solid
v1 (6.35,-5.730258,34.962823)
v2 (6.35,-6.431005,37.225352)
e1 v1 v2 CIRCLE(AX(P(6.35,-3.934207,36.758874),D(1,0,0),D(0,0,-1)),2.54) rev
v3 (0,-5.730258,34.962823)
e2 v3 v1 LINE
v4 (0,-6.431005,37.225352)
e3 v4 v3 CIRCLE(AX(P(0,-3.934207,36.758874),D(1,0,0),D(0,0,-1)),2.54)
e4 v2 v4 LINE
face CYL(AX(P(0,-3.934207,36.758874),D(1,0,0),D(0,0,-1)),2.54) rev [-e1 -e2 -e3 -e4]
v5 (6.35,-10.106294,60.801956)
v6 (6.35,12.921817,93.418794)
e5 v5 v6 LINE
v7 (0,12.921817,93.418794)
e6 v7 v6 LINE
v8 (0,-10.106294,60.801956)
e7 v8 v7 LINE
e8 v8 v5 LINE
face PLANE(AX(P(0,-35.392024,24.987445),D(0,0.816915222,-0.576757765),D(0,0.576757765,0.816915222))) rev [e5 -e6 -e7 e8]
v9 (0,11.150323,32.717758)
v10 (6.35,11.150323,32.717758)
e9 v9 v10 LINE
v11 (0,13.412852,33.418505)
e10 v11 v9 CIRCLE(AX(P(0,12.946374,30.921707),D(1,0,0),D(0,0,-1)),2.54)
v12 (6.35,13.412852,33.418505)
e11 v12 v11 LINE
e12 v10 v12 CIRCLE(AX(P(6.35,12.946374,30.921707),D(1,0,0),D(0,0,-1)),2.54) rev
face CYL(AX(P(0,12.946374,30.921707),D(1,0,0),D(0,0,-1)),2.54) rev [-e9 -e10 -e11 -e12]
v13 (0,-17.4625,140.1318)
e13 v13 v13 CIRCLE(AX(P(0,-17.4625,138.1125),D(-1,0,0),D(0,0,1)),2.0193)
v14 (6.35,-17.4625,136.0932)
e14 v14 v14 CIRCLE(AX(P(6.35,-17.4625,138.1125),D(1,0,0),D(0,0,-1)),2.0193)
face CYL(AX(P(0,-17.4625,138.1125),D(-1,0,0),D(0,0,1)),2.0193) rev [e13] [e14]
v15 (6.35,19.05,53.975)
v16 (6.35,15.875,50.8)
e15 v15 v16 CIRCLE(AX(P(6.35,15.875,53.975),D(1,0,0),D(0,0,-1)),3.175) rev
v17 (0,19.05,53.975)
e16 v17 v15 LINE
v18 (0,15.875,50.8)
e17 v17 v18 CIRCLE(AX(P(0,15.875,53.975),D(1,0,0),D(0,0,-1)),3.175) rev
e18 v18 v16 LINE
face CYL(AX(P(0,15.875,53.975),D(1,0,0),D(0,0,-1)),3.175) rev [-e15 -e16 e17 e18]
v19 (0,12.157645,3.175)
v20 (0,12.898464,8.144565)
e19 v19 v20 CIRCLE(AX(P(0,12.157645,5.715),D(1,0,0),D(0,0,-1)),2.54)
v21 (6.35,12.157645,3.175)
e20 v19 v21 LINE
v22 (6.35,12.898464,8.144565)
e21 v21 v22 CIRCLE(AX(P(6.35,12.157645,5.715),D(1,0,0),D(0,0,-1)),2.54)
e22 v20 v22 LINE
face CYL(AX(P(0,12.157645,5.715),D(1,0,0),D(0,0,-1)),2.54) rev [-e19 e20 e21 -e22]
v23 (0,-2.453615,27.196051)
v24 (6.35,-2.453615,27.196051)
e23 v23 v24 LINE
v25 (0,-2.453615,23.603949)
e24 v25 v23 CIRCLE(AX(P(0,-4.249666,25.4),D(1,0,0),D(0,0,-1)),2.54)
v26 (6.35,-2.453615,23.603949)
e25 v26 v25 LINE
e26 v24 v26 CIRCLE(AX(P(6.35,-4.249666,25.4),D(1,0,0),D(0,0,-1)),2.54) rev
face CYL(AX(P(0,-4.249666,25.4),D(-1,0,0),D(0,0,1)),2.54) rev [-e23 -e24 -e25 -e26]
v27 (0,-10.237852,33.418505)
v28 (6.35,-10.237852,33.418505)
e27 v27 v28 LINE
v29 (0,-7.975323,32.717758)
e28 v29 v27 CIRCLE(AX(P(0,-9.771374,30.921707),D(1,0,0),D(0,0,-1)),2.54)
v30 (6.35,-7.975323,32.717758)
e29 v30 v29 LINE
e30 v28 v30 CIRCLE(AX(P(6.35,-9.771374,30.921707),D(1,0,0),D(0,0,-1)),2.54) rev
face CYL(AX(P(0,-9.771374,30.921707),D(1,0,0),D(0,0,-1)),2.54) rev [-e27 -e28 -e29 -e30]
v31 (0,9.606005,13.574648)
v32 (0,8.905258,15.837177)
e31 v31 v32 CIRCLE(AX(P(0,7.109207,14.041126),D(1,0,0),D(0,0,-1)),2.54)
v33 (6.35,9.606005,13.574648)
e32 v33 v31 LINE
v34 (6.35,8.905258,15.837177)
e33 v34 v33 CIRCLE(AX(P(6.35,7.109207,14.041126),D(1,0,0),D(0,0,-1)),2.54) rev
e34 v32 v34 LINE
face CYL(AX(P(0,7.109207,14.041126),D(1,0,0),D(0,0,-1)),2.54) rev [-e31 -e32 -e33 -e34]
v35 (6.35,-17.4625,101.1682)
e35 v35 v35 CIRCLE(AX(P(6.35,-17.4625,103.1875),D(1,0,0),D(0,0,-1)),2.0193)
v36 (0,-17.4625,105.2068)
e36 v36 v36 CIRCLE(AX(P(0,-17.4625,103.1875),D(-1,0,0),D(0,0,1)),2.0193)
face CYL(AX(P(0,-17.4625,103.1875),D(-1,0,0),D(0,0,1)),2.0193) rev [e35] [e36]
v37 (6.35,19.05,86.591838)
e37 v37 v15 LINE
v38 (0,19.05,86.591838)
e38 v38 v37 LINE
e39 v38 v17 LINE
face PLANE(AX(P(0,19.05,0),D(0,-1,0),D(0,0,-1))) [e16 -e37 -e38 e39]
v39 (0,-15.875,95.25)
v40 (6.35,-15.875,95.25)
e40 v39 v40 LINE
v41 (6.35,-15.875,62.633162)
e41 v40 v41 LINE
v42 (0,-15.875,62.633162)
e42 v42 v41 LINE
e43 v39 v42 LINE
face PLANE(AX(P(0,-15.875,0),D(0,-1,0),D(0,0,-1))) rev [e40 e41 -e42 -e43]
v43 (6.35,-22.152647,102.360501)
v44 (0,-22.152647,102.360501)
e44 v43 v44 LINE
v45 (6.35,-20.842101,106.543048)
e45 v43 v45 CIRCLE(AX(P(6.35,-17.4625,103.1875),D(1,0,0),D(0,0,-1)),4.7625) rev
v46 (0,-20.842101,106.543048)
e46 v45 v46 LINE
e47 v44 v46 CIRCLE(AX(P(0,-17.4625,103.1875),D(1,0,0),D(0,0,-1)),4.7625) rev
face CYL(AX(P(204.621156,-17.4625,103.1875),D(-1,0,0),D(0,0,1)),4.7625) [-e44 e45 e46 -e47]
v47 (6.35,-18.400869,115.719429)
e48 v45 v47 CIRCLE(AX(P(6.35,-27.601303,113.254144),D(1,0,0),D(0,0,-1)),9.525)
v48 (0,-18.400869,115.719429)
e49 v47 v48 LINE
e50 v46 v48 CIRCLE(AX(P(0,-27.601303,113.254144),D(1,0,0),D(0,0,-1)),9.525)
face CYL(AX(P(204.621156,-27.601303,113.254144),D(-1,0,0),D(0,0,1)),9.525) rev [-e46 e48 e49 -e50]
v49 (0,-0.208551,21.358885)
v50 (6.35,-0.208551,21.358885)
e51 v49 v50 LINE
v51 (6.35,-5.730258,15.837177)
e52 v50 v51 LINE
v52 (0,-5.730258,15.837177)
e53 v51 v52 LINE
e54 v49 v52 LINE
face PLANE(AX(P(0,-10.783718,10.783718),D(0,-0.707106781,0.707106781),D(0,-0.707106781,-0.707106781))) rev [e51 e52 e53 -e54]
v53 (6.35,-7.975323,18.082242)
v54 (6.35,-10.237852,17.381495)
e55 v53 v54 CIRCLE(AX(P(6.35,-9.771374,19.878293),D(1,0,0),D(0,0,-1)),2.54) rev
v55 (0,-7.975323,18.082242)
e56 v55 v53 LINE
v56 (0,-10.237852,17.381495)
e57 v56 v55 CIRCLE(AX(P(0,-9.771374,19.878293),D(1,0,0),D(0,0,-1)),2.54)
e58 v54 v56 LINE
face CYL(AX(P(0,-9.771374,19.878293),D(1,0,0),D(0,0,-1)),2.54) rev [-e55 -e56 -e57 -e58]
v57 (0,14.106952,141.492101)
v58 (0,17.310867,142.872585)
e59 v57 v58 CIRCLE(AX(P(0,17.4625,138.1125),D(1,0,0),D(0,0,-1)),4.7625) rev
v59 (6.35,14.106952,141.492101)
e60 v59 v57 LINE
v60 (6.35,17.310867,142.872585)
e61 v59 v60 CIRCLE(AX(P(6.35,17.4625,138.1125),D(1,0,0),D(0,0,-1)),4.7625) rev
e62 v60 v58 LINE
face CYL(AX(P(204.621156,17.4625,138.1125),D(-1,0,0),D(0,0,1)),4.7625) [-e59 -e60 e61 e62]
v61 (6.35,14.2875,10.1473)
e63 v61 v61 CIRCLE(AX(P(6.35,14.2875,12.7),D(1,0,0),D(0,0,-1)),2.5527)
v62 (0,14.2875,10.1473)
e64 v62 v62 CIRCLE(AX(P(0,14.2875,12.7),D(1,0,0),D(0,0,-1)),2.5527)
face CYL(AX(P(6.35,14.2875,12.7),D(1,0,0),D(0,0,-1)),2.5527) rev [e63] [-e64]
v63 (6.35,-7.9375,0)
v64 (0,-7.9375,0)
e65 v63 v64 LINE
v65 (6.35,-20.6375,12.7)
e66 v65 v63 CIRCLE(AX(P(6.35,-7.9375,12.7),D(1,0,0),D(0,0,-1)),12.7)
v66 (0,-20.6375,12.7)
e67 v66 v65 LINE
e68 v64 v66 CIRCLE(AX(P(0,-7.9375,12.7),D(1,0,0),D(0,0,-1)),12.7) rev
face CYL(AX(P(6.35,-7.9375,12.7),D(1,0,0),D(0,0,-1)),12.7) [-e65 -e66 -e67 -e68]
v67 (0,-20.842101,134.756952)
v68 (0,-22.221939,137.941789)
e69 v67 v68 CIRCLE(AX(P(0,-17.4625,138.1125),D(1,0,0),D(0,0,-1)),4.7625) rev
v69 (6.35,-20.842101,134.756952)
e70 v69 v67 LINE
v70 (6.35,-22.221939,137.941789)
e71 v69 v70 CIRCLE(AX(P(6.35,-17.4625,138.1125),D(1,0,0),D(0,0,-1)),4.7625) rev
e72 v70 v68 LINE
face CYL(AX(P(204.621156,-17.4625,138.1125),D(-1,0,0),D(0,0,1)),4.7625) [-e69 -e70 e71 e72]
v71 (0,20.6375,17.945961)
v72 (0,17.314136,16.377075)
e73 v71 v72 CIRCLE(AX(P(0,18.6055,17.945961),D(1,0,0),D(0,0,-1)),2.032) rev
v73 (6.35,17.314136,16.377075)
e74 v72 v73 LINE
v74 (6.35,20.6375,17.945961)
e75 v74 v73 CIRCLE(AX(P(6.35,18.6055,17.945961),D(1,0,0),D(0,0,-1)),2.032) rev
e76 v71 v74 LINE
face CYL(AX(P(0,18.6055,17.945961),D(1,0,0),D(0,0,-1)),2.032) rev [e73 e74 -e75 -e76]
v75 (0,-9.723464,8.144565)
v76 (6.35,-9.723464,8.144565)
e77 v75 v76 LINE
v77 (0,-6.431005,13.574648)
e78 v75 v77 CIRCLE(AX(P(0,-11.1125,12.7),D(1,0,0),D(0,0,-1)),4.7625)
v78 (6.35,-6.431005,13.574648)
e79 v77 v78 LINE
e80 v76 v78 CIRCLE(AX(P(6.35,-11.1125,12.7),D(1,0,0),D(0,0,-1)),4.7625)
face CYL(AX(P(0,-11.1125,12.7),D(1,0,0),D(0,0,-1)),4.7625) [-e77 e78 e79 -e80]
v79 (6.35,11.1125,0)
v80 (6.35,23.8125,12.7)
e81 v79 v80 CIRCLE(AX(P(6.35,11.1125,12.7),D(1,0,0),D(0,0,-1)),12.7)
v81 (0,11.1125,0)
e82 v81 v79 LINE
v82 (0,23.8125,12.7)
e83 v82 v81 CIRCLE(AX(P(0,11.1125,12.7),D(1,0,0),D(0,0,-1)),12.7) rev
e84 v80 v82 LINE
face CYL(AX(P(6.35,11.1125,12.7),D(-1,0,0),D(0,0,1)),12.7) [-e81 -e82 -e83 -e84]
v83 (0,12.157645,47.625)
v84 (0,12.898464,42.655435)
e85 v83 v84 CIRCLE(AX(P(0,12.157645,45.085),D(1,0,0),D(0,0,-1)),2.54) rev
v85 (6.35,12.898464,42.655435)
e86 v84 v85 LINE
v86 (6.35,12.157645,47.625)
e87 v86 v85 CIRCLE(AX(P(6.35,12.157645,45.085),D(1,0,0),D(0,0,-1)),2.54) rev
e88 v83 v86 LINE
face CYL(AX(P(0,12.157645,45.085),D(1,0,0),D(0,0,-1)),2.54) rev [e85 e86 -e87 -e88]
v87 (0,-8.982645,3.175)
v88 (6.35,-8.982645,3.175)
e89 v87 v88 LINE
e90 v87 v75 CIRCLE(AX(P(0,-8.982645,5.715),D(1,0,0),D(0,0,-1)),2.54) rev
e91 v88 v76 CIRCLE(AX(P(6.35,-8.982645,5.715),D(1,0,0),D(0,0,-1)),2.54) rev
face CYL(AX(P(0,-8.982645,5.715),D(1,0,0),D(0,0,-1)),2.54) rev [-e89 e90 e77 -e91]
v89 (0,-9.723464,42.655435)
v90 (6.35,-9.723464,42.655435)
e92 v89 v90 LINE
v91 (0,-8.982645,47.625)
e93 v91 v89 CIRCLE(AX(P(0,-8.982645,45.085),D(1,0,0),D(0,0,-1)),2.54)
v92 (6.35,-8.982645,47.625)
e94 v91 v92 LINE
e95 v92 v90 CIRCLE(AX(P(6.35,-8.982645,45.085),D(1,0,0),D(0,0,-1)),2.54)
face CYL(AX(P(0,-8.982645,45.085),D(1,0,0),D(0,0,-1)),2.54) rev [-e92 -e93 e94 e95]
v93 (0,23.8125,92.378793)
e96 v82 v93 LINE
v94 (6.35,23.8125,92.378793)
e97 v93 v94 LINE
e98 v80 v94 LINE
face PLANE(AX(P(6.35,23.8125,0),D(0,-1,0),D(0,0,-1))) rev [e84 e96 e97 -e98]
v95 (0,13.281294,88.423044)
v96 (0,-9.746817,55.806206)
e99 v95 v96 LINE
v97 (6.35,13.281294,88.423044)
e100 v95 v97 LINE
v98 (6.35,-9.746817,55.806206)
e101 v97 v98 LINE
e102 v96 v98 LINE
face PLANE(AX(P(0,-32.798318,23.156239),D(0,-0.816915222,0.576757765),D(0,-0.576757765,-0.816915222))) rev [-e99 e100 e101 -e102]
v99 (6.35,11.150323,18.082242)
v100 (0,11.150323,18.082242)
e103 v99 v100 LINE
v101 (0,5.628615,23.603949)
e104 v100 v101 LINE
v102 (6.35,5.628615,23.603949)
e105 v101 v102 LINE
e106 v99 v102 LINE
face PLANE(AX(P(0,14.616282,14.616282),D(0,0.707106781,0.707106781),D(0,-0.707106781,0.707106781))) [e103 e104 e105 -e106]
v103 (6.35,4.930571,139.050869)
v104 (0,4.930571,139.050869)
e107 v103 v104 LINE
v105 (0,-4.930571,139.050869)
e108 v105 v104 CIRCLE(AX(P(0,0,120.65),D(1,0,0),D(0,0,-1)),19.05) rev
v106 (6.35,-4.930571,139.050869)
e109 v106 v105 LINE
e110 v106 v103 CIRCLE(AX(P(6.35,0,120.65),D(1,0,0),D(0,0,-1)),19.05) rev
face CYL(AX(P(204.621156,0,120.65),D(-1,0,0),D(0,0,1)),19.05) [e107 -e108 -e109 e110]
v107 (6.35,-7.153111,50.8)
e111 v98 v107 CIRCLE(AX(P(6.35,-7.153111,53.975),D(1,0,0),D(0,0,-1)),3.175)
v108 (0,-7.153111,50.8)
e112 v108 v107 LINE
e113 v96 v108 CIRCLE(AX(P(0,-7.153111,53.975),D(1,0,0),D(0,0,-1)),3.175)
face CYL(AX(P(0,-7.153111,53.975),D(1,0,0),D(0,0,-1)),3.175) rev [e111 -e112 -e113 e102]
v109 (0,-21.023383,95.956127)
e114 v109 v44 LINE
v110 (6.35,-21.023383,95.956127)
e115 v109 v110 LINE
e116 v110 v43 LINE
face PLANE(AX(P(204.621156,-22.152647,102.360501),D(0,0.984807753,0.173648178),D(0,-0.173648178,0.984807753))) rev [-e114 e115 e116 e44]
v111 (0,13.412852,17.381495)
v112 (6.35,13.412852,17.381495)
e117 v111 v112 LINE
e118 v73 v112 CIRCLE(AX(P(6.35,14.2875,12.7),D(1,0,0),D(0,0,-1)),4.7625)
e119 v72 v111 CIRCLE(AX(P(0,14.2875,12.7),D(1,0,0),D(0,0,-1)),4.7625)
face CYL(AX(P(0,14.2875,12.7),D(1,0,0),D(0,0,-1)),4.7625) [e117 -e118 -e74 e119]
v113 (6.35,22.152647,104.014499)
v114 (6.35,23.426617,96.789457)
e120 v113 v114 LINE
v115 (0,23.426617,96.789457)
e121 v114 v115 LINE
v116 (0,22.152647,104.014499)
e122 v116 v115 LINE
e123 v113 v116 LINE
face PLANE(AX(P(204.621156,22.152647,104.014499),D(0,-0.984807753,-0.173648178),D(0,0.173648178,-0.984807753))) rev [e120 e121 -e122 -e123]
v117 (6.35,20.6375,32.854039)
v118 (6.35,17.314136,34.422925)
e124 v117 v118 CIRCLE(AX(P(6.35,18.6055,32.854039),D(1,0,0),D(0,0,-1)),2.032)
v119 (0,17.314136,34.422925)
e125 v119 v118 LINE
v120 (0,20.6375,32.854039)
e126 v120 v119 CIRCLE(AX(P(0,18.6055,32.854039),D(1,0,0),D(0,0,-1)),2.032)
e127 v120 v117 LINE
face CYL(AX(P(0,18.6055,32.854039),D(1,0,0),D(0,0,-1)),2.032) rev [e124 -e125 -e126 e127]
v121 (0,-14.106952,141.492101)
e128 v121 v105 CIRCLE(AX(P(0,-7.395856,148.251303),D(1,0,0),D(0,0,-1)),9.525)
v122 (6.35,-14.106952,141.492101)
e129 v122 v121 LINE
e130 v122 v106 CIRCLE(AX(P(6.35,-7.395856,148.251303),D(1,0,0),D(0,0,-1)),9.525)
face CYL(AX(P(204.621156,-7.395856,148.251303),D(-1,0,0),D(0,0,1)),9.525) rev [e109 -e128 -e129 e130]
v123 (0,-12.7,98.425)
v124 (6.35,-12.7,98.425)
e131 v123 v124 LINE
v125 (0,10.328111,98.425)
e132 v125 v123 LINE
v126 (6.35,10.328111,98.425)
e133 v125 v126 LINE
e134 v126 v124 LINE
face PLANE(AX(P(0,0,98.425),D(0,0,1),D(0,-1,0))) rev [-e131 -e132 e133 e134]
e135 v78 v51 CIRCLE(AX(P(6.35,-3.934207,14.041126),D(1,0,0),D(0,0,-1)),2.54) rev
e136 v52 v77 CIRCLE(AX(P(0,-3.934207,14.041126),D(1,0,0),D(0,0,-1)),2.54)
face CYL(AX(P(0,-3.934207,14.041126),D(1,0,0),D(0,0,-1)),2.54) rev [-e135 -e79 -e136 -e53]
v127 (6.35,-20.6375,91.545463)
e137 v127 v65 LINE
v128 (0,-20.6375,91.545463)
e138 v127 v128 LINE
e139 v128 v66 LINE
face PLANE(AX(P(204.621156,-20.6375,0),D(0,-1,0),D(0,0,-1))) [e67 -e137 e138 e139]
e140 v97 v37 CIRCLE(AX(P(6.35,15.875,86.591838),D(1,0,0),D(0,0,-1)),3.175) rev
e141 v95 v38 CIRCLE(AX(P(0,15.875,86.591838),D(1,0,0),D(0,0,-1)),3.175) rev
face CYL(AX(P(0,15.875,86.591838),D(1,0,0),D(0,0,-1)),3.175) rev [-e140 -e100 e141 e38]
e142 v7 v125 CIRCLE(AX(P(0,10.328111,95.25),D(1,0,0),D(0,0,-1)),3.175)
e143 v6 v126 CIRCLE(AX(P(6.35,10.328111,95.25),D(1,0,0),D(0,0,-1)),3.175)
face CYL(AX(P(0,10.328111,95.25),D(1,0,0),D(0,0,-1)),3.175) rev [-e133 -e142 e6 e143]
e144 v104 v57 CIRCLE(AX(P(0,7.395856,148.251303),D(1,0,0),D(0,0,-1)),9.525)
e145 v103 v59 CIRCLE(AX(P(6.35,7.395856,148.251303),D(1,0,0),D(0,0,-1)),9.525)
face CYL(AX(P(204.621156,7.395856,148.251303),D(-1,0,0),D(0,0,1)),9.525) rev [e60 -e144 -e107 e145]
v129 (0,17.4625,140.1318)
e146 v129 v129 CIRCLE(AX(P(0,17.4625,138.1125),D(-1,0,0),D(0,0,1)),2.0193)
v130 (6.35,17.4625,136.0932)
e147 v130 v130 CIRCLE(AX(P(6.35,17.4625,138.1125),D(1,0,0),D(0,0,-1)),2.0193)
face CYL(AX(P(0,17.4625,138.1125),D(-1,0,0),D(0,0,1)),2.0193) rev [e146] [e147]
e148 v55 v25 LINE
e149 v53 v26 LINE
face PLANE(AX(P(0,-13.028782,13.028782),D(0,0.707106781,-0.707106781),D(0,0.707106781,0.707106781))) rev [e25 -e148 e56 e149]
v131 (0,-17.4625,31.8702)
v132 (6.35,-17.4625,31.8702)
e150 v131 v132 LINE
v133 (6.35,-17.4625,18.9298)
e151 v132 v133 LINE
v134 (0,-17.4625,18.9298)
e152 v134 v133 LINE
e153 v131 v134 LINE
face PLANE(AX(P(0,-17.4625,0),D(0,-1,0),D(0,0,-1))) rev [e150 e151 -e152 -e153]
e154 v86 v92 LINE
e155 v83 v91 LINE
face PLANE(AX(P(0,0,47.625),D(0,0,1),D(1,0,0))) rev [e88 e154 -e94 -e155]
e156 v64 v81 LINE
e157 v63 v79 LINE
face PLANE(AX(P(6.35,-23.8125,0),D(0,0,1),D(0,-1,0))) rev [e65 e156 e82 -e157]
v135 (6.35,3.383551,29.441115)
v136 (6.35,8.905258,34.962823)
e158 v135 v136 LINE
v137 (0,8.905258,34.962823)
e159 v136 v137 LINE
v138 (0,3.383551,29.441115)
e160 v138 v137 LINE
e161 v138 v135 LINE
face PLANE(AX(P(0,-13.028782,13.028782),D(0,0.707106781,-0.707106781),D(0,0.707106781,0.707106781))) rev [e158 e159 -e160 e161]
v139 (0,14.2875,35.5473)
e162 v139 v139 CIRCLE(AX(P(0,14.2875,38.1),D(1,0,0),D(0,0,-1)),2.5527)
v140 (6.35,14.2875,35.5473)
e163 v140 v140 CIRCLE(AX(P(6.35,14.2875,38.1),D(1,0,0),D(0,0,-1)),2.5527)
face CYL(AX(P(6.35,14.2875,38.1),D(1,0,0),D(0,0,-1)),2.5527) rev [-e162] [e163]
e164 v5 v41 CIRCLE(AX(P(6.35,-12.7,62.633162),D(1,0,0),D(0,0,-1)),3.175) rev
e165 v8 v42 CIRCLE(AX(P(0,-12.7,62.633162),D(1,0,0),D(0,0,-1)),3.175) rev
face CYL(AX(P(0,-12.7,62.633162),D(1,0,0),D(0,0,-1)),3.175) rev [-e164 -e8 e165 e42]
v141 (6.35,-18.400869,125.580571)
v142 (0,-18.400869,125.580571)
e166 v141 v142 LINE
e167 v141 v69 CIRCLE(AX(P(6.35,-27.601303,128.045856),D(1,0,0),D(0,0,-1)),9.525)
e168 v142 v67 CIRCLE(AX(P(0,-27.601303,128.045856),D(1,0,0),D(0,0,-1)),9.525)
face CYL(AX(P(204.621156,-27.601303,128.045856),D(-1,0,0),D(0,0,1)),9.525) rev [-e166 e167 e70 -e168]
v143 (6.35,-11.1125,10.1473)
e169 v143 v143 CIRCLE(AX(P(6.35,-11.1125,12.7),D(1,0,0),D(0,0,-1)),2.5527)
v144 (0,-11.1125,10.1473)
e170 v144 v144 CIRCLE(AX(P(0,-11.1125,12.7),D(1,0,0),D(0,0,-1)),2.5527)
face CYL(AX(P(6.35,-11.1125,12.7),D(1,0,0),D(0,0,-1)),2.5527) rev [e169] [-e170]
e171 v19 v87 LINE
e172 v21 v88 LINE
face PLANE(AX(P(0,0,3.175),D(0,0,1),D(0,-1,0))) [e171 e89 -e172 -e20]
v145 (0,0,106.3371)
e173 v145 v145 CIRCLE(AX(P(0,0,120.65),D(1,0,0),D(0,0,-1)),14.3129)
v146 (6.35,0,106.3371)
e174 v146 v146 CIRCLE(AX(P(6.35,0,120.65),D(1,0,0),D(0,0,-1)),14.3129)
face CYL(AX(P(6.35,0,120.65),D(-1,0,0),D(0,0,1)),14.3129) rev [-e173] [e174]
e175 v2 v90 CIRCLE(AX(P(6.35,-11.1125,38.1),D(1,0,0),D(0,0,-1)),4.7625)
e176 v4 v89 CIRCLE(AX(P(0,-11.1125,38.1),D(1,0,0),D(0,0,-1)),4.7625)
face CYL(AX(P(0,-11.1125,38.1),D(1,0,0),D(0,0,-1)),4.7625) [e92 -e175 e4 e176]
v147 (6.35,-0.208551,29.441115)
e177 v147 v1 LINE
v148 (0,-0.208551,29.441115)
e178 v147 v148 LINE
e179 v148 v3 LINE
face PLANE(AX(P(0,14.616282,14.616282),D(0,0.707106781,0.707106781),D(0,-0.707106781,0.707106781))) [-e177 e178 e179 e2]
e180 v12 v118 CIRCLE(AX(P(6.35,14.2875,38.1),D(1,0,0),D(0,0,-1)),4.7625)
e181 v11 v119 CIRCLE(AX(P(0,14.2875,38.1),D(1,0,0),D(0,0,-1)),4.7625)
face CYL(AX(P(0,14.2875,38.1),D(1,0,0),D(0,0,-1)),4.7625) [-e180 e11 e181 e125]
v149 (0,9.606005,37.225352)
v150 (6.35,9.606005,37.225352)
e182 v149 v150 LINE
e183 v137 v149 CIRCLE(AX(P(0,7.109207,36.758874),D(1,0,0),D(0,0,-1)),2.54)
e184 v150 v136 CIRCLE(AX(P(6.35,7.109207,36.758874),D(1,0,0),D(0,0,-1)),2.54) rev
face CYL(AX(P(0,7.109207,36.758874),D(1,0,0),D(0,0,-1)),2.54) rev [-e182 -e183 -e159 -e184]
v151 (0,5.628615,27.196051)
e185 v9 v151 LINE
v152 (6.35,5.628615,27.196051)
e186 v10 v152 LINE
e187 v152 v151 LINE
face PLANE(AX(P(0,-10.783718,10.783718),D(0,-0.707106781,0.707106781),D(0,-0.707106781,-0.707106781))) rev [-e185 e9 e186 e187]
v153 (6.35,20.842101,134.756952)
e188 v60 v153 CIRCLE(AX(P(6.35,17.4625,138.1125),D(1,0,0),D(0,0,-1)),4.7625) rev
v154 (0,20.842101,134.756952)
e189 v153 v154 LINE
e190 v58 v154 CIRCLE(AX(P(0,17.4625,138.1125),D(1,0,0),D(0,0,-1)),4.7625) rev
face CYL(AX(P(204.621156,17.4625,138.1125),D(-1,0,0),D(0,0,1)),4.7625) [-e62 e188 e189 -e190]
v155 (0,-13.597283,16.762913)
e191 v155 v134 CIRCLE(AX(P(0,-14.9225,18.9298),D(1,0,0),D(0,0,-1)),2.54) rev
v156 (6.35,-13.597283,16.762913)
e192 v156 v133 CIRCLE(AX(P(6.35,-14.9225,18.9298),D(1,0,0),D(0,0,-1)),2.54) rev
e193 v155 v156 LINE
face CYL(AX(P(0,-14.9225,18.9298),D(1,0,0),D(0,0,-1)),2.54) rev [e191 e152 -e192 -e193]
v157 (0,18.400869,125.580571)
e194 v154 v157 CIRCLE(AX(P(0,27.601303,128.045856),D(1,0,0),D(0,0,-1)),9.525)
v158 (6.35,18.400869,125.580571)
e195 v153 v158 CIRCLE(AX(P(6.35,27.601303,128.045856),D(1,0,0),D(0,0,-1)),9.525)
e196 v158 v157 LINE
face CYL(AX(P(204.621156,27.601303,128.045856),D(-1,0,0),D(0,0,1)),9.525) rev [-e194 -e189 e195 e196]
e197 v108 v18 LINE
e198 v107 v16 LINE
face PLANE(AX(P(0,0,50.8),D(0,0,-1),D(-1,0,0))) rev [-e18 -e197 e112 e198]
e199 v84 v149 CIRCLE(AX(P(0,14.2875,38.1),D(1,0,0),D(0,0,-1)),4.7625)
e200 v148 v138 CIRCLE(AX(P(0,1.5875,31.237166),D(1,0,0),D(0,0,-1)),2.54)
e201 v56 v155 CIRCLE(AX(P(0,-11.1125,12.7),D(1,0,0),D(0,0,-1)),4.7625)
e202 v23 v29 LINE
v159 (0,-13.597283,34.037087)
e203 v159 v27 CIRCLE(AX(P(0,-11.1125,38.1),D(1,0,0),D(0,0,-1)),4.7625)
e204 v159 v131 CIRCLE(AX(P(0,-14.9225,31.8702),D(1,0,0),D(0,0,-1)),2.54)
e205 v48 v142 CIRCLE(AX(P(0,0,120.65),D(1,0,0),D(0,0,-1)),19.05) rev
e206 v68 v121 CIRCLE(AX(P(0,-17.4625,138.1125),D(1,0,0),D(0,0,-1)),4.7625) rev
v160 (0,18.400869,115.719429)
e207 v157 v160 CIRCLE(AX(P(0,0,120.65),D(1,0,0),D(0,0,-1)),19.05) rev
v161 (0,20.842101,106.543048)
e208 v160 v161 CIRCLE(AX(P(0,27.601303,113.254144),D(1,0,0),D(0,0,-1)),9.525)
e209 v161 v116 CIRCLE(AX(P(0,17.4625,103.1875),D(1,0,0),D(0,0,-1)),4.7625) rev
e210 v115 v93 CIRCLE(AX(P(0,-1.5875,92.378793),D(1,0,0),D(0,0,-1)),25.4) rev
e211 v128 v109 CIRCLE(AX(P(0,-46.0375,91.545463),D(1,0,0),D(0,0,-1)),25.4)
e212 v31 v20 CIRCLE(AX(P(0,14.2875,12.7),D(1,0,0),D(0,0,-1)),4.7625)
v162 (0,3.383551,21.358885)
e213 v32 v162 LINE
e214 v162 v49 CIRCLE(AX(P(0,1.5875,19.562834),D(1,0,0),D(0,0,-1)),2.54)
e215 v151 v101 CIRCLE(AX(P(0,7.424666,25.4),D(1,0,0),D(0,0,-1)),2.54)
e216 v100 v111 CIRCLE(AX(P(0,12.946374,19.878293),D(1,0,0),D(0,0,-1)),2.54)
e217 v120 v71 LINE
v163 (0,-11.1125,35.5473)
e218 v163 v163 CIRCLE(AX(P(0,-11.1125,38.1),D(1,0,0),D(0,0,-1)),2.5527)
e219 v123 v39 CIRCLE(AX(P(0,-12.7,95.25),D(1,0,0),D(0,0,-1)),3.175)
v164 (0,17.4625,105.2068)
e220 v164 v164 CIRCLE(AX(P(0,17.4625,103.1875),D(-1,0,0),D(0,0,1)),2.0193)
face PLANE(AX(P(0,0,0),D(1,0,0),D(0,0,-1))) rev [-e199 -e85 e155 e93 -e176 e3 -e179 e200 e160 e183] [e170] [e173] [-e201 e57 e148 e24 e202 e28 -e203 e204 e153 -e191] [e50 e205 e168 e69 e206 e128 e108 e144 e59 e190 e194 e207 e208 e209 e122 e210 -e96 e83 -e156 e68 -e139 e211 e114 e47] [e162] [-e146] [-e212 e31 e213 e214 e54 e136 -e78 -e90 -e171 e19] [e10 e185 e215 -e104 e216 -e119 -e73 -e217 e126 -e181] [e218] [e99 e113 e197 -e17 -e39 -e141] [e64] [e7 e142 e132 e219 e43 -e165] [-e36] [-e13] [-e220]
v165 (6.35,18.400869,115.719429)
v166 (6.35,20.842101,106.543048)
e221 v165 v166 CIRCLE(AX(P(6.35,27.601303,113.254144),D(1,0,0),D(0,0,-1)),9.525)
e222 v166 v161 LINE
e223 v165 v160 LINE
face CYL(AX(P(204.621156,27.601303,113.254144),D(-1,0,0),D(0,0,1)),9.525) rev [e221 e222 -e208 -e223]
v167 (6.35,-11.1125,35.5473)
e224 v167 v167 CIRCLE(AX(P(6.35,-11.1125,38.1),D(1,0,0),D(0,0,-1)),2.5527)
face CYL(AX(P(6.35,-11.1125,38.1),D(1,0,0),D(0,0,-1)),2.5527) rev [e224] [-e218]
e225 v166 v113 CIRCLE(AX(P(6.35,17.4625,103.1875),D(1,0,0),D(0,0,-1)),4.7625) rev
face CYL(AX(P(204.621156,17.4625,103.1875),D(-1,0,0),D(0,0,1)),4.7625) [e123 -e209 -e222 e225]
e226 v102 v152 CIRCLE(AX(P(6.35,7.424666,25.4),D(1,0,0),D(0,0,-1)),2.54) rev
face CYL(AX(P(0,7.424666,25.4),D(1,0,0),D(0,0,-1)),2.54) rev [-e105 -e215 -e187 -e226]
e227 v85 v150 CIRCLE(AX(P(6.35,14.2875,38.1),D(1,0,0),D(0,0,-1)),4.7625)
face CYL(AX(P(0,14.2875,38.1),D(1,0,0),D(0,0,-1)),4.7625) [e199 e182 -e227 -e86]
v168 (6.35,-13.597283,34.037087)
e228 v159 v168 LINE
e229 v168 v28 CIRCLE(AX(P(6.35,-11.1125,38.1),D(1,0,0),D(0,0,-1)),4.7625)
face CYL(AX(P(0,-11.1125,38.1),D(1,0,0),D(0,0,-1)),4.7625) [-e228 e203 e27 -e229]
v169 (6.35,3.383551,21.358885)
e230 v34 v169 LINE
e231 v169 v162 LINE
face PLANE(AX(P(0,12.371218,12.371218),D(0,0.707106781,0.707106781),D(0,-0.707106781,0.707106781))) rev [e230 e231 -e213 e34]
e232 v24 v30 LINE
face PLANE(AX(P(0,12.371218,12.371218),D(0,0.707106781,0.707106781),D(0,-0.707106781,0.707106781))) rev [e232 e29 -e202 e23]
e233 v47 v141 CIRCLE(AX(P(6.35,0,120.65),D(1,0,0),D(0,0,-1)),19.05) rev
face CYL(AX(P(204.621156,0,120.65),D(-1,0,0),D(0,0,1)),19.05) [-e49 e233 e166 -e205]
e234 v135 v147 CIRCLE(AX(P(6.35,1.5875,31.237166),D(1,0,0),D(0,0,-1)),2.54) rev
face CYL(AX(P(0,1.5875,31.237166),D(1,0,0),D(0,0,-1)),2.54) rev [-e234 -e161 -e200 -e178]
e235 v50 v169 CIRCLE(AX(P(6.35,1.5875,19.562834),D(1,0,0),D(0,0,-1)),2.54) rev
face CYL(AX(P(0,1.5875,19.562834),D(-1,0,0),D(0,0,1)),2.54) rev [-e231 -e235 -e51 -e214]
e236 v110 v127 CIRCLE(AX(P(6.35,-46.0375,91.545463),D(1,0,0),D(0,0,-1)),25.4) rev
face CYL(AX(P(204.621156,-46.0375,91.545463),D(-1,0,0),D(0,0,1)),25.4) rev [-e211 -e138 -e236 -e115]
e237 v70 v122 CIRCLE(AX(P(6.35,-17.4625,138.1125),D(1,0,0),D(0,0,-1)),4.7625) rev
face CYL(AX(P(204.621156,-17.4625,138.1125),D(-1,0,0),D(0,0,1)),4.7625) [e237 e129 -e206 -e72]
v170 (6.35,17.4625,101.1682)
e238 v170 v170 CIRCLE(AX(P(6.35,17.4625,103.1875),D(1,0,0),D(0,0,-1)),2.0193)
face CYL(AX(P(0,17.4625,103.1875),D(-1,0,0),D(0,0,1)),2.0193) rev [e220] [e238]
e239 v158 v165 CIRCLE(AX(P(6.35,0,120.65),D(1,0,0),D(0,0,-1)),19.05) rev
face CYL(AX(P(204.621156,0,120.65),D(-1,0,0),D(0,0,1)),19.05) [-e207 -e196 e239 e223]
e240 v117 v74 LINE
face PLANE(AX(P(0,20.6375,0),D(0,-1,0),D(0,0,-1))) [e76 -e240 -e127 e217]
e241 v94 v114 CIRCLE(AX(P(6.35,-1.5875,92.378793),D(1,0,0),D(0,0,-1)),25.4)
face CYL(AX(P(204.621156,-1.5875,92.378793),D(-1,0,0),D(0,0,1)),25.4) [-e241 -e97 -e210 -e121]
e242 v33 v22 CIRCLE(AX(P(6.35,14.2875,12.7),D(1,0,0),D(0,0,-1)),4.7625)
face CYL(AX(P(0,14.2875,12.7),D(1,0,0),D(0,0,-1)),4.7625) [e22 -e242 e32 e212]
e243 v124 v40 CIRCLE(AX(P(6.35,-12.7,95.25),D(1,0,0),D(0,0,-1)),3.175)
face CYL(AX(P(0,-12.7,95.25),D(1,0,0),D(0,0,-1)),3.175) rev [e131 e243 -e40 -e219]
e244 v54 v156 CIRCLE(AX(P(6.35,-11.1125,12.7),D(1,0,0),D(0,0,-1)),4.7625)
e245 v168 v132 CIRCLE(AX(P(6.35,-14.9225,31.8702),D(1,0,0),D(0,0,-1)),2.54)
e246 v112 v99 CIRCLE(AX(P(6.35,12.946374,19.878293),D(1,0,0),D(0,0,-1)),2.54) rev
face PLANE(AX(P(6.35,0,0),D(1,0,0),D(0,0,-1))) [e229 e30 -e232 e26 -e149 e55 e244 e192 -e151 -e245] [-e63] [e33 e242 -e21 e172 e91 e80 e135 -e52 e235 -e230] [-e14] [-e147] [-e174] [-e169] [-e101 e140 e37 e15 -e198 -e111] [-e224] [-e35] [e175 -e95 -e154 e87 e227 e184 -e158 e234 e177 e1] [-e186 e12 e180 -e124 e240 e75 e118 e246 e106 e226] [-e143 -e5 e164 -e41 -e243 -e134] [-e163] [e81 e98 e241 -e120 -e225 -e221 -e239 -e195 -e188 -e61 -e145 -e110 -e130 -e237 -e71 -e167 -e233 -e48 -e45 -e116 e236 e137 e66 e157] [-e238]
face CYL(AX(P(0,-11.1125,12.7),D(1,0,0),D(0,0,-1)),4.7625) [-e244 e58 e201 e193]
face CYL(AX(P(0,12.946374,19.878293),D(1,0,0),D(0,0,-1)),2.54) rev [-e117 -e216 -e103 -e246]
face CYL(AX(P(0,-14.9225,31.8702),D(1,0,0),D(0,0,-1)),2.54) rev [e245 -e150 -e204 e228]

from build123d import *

# Parameters (mm, degrees)
SKETCH1_W               = 144.4879
SKETCH1_H               = 47.625
SKETCH1_R               = 14.3129
BOSS_EXTRUDE1_DEPTH     = 6.35
FILLET1_R               = 12.7
F_10_32_TAPPED_HOLE1_D  = 4.0386
F_10_CLEARANCE_HOLE1_D  = 5.1054
CUT_EXTRUDE2_DEPTH      = 147.5745916
CUT_EXTRUDE2_DEPTH_BACK = 147.5745916
DELETEFACE1_OUTLINE_W   = 6.35
DELETEFACE1_OUTLINE_H   = 31.75
DELETEFACE1_DEPTH       = 5
FILLET3_R               = 12.7
CUT_EXTRUDE1_DEPTH      = 147.5745916
CUT_EXTRUDE3_DEPTH      = 147.5745916
CUT_EXTRUDE3_DEPTH_BACK = 147.5745916
FILLET2_R               = 2.54
DELETEFACE2_DEPTH       = 6.35
FILLET4_R               = 25.4


with BuildPart() as part:
    # Sketch1 → Boss-Extrude1 (new body)
    with BuildSketch(Plane(origin=(0, 0, 0), x_dir=(0, 0, -1), z_dir=(1, 0, 0))):
        with Locations((-72.24395, 0)):
            Rectangle(SKETCH1_W, SKETCH1_H)
        with Locations((-120.65, 0)):
            Circle(SKETCH1_R, mode=Mode.SUBTRACT)
    extrude(amount=BOSS_EXTRUDE1_DEPTH)

    # Fillet1
    fillet1_edges = [part.edges().sort_by_distance(p)[0] for p in [
        (3.175, -23.8125, 144.4879),
        (3.175, 23.8125, 144.4879),
        (3.175, 23.8125, 0),
        (3.175, -23.8125, 0),
    ]]
    fillet(fillet1_edges, radius=FILLET1_R)

    # #10-32 Tapped Hole1 (through all)
    with Locations(Plane.ZY):
        with Locations((103.1875, 17.4625), (138.1125, 17.4625), (138.1125, -17.4625), (103.1875, -17.4625)):
            Hole(F_10_32_TAPPED_HOLE1_D / 2)

    # #10 Clearance Hole1 (through all)
    with Locations(Plane(origin=(6.35, 0, 0), x_dir=(0, 0, -1), z_dir=(1, 0, 0))):
        with Locations((-12.7, 14.2875), (-38.1, 14.2875), (-38.1, -11.1125), (-12.7, -11.1125)):
            Hole(F_10_CLEARANCE_HOLE1_D / 2)

    # Sketch9 → Cut-Extrude2 (cut, two sides: drawn at the far end of the back side and taken through both)
    with BuildSketch(Plane(origin=(6.35, 0, 0), x_dir=(0, 0, -1), z_dir=(1, 0, 0)).offset(-CUT_EXTRUDE2_DEPTH_BACK)):
        with BuildLine():
            Line((312.341235999, -20.6375), (0, -20.6375))
            Line((0, -20.6375), (-89.737984171, -20.6375))
            ThreePointArc((-89.737984171, -20.6375), (-93.626549138, -21.4674044), (-96.8375, -23.8125))
            Line((-96.8375, -23.8125), (-305.064990666, -256.617911957))
            Line((-305.064990666, -256.617911957), (-82.038945456, -840.131042898))
            Line((-82.038945456, -840.131042898), (535.36728121, -604.150630941))
            Line((535.36728121, -604.150630941), (312.341235999, -20.6375))
        make_face()
    extrude(amount=CUT_EXTRUDE2_DEPTH + CUT_EXTRUDE2_DEPTH_BACK, mode=Mode.SUBTRACT)

    # DeleteFace1: read off the stored shape, not the designer's step
    # DeleteFace1 outline → DeleteFace1 (add)
    with BuildSketch(Plane.XY):
        with Locations((3.175, -4.7625)):
            Rectangle(DELETEFACE1_OUTLINE_W, DELETEFACE1_OUTLINE_H)
    extrude(amount=DELETEFACE1_DEPTH)

    # Fillet3
    fillet3_edges = [part.edges().sort_by_distance(p)[0] for p in [
        (3.175, -23.8125, 96.8375),
        (3.175, -20.6375, 0),
    ]]
    fillet(fillet3_edges, radius=FILLET3_R)

    # Sketch8 → Cut-Extrude1 (cut, through all)
    with BuildSketch(Plane(origin=(6.35, 0, 0), x_dir=(0, 0, -1), z_dir=(1, 0, 0))):
        with BuildLine():
            ThreePointArc((-34.03708705, -13.597282609), (-33.343854424, -11.358438021), (-33.802467985, -9.060032015))
            Line((-33.802467985, -9.060032015), (-25.4, -0.65756403))
            Line((-25.4, -0.65756403), (-16.997532015, -9.060032015))
            ThreePointArc((-16.997532015, -9.060032015), (-17.456145576, -11.358438021), (-16.76291295, -13.597282609))
            ThreePointArc((-16.76291295, -13.597282609), (-16.714212781, -16.164584503), (-18.929799856, -17.4625))
            Line((-18.929799856, -17.4625), (-31.870200144, -17.4625))
            ThreePointArc((-31.870200144, -17.4625), (-34.085787219, -16.164584503), (-34.03708705, -13.597282609))
        make_face()
        with BuildLine():
            ThreePointArc((-8.144565217, 12.898464294), (-10.781394154, 9.928560008), (-14.752467985, 9.989967985))
            Line((-14.752467985, 9.989967985), (-23.15493597, 1.5875))
            Line((-23.15493597, 1.5875), (-14.752467985, -6.814967985))
            ThreePointArc((-14.752467985, -6.814967985), (-10.781394154, -6.753560008), (-8.144565217, -9.723464294))
            ThreePointArc((-8.144565217, -9.723464294), (-5.340497431, -11.494884855), (-3.175, -8.982645251))
            Line((-3.175, -8.982645251), (-3.175, 12.157645251))
            ThreePointArc((-3.175, 12.157645251), (-5.340497431, 14.669884855), (-8.144565217, 12.898464294))
        make_face()
        with BuildLine():
            Line((-32.854039054, 20.6375), (-17.945960946, 20.6375))
            ThreePointArc((-17.945960946, 20.6375), (-16.10842501, 19.472959326), (-16.37707543, 17.314135514))
            ThreePointArc((-16.37707543, 17.314135514), (-17.427358043, 14.864987824), (-16.997532015, 12.235032015))
            Line((-16.997532015, 12.235032015), (-25.4, 3.83256403))
            Line((-25.4, 3.83256403), (-33.802467985, 12.235032015))
            ThreePointArc((-33.802467985, 12.235032015), (-33.372641957, 14.864987824), (-34.42292457, 17.314135514))
            ThreePointArc((-34.42292457, 17.314135514), (-34.69157499, 19.472959326), (-32.854039054, 20.6375))
        make_face()
        with BuildLine():
            ThreePointArc((-47.625, 12.157645251), (-45.459502569, 14.669884855), (-42.655434783, 12.898464294))
            ThreePointArc((-42.655434783, 12.898464294), (-40.018605846, 9.928560008), (-36.047532015, 9.989967985))
            Line((-36.047532015, 9.989967985), (-27.64506403, 1.5875))
            Line((-27.64506403, 1.5875), (-36.047532015, -6.814967985))
            ThreePointArc((-36.047532015, -6.814967985), (-40.018605846, -6.753560008), (-42.655434783, -9.723464294))
            ThreePointArc((-42.655434783, -9.723464294), (-45.459502569, -11.494884855), (-47.625, -8.982645251))
            Line((-47.625, -8.982645251), (-47.625, 12.157645251))
        make_face()
        with BuildLine():
            ThreePointArc((-88.423043936, 13.28129417), (-89.618027137, 16.835627136), (-86.591838031, 19.05))
            Line((-86.591838031, 19.05), (-53.975, 19.05))
            ThreePointArc((-53.975, 19.05), (-51.72993597, 18.12006403), (-50.8, 15.875))
            Line((-50.8, 15.875), (-50.8, -7.153111257))
            ThreePointArc((-50.8, -7.153111257), (-52.514427124, -9.972216057), (-55.806205905, -9.746817086))
            Line((-55.806205905, -9.746817086), (-88.423043936, 13.28129417))
        make_face()
        with BuildLine():
            ThreePointArc((-60.801956064, -10.10629417), (-59.606972863, -13.660627136), (-62.633161969, -15.875))
            Line((-62.633161969, -15.875), (-95.25, -15.875))
            ThreePointArc((-95.25, -15.875), (-97.49506403, -14.94506403), (-98.425, -12.7))
            Line((-98.425, -12.7), (-98.425, 10.328111257))
            ThreePointArc((-98.425, 10.328111257), (-96.710572876, 13.147216057), (-93.418794095, 12.921817086))
            Line((-93.418794095, 12.921817086), (-60.801956064, -10.10629417))
        make_face()
    extrude(amount=-CUT_EXTRUDE1_DEPTH, mode=Mode.SUBTRACT)

    # Sketch10 → Cut-Extrude3 (cut, two sides: drawn at the far end of the back side and taken through both)
    with BuildSketch(Plane(origin=(6.35, 0, 0), x_dir=(0, 0, -1), z_dir=(1, 0, 0)).offset(-CUT_EXTRUDE3_DEPTH_BACK)):
        with BuildLine():
            Line((132.08732827, -20.6375), (-89.737984171, -20.6375))
            Line((-89.737984171, -20.6375), (-93.767675351, -20.6375))
            Line((-93.767675351, -20.6375), (-102.360500554, -22.152646924))
            ThreePointArc((-102.360500554, -22.152646924), (-104.611498636, -22.007126952), (-106.543048055, -20.842101086))
            ThreePointArc((-106.543048055, -20.842101086), (-110.805342188, -18.396467904), (-115.719429444, -18.400868838))
            ThreePointArc((-115.719429444, -18.400868838), (-120.65, -19.05), (-125.580570556, -18.400868838))
            ThreePointArc((-125.580570556, -18.400868838), (-130.494657812, -18.396467904), (-134.756951945, -20.842101086))
            ThreePointArc((-134.756951945, -20.842101086), (-141.480096045, -20.830096045), (-141.492101086, -14.106951945))
            ThreePointArc((-141.492101086, -14.106951945), (-139.046467904, -9.844657812), (-139.050868838, -4.930570556))
            ThreePointArc((-139.050868838, -4.930570556), (-139.7, 0), (-139.050868838, 4.930570556))
            ThreePointArc((-139.050868838, 4.930570556), (-139.046467904, 9.844657812), (-141.492101086, 14.106951945))
            ThreePointArc((-141.492101086, 14.106951945), (-141.480096045, 20.830096045), (-134.756951945, 20.842101086))
            ThreePointArc((-134.756951945, 20.842101086), (-130.494657812, 18.396467904), (-125.580570556, 18.400868838))
            ThreePointArc((-125.580570556, 18.400868838), (-120.65, 19.05), (-115.719429444, 18.400868838))
            ThreePointArc((-115.719429444, 18.400868838), (-110.805342188, 18.396467904), (-106.543048055, 20.842101086))
            ThreePointArc((-106.543048055, 20.842101086), (-105.379031086, 21.690809089), (-104.014499446, 22.152646924))
            Line((-104.014499446, 22.152646924), (-94.601004871, 23.8125))
            Line((-94.601004871, 23.8125), (123.854282635, 62.332061266))
            Line((123.854282635, 62.332061266), (-317.628130355, 18.523888755))
            Line((-317.628130355, 18.523888755), (-309.39508472, -64.445672511))
            Line((-309.39508472, -64.445672511), (132.08732827, -20.6375))
        make_face()
    extrude(amount=CUT_EXTRUDE3_DEPTH + CUT_EXTRUDE3_DEPTH_BACK, mode=Mode.SUBTRACT)

    # Fillet2
    fillet2_edges = [part.edges().sort_by_distance(p)[0] for p in [
        (3.175, 9.989967985, 36.047532015),
        (3.175, 1.5875, 27.64506403),
        (3.175, -6.814967985, 36.047532015),
        (3.175, -6.814967985, 14.752467985),
        (3.175, 1.5875, 23.15493597),
        (3.175, 9.989967985, 14.752467985),
        (3.175, 12.235032015, 16.997532015),
        (3.175, 3.83256403, 25.4),
        (3.175, 12.235032015, 33.802467985),
        (3.175, -9.060032015, 33.802467985),
        (3.175, -0.65756403, 25.4),
        (3.175, -9.060032015, 16.997532015),
    ]]
    fillet(fillet2_edges, radius=FILLET2_R)

    # DeleteFace2: read off the stored shape, not the designer's step
    # DeleteFace2 outline → DeleteFace2 (add)
    with BuildSketch(Plane.YZ):
        with BuildLine():
            ThreePointArc((22.221939477, 137.941789381), (20.836837959, 141.473340607), (17.310866585, 142.872585457))
            ThreePointArc((17.310866585, 142.872585457), (20.110734558, 140.750141619), (22.221939477, 137.941789381))
        make_face()
        with BuildLine():
            ThreePointArc((-17.310866585, 142.872585457), (-20.836837959, 141.473340607), (-22.221939477, 137.941789381))
            ThreePointArc((-22.221939477, 137.941789381), (-20.110734558, 140.750141619), (-17.310866585, 142.872585457))
        make_face()
    extrude(amount=DELETEFACE2_DEPTH)

    # Fillet4
    fillet4_edges = [part.edges().sort_by_distance(p)[0] for p in [
        (3.175, 23.8125, 94.601004871),
        (3.175, -20.6375, 93.767675351),
    ]]
    fillet(fillet4_edges, radius=FILLET4_R)


solid = part.part
